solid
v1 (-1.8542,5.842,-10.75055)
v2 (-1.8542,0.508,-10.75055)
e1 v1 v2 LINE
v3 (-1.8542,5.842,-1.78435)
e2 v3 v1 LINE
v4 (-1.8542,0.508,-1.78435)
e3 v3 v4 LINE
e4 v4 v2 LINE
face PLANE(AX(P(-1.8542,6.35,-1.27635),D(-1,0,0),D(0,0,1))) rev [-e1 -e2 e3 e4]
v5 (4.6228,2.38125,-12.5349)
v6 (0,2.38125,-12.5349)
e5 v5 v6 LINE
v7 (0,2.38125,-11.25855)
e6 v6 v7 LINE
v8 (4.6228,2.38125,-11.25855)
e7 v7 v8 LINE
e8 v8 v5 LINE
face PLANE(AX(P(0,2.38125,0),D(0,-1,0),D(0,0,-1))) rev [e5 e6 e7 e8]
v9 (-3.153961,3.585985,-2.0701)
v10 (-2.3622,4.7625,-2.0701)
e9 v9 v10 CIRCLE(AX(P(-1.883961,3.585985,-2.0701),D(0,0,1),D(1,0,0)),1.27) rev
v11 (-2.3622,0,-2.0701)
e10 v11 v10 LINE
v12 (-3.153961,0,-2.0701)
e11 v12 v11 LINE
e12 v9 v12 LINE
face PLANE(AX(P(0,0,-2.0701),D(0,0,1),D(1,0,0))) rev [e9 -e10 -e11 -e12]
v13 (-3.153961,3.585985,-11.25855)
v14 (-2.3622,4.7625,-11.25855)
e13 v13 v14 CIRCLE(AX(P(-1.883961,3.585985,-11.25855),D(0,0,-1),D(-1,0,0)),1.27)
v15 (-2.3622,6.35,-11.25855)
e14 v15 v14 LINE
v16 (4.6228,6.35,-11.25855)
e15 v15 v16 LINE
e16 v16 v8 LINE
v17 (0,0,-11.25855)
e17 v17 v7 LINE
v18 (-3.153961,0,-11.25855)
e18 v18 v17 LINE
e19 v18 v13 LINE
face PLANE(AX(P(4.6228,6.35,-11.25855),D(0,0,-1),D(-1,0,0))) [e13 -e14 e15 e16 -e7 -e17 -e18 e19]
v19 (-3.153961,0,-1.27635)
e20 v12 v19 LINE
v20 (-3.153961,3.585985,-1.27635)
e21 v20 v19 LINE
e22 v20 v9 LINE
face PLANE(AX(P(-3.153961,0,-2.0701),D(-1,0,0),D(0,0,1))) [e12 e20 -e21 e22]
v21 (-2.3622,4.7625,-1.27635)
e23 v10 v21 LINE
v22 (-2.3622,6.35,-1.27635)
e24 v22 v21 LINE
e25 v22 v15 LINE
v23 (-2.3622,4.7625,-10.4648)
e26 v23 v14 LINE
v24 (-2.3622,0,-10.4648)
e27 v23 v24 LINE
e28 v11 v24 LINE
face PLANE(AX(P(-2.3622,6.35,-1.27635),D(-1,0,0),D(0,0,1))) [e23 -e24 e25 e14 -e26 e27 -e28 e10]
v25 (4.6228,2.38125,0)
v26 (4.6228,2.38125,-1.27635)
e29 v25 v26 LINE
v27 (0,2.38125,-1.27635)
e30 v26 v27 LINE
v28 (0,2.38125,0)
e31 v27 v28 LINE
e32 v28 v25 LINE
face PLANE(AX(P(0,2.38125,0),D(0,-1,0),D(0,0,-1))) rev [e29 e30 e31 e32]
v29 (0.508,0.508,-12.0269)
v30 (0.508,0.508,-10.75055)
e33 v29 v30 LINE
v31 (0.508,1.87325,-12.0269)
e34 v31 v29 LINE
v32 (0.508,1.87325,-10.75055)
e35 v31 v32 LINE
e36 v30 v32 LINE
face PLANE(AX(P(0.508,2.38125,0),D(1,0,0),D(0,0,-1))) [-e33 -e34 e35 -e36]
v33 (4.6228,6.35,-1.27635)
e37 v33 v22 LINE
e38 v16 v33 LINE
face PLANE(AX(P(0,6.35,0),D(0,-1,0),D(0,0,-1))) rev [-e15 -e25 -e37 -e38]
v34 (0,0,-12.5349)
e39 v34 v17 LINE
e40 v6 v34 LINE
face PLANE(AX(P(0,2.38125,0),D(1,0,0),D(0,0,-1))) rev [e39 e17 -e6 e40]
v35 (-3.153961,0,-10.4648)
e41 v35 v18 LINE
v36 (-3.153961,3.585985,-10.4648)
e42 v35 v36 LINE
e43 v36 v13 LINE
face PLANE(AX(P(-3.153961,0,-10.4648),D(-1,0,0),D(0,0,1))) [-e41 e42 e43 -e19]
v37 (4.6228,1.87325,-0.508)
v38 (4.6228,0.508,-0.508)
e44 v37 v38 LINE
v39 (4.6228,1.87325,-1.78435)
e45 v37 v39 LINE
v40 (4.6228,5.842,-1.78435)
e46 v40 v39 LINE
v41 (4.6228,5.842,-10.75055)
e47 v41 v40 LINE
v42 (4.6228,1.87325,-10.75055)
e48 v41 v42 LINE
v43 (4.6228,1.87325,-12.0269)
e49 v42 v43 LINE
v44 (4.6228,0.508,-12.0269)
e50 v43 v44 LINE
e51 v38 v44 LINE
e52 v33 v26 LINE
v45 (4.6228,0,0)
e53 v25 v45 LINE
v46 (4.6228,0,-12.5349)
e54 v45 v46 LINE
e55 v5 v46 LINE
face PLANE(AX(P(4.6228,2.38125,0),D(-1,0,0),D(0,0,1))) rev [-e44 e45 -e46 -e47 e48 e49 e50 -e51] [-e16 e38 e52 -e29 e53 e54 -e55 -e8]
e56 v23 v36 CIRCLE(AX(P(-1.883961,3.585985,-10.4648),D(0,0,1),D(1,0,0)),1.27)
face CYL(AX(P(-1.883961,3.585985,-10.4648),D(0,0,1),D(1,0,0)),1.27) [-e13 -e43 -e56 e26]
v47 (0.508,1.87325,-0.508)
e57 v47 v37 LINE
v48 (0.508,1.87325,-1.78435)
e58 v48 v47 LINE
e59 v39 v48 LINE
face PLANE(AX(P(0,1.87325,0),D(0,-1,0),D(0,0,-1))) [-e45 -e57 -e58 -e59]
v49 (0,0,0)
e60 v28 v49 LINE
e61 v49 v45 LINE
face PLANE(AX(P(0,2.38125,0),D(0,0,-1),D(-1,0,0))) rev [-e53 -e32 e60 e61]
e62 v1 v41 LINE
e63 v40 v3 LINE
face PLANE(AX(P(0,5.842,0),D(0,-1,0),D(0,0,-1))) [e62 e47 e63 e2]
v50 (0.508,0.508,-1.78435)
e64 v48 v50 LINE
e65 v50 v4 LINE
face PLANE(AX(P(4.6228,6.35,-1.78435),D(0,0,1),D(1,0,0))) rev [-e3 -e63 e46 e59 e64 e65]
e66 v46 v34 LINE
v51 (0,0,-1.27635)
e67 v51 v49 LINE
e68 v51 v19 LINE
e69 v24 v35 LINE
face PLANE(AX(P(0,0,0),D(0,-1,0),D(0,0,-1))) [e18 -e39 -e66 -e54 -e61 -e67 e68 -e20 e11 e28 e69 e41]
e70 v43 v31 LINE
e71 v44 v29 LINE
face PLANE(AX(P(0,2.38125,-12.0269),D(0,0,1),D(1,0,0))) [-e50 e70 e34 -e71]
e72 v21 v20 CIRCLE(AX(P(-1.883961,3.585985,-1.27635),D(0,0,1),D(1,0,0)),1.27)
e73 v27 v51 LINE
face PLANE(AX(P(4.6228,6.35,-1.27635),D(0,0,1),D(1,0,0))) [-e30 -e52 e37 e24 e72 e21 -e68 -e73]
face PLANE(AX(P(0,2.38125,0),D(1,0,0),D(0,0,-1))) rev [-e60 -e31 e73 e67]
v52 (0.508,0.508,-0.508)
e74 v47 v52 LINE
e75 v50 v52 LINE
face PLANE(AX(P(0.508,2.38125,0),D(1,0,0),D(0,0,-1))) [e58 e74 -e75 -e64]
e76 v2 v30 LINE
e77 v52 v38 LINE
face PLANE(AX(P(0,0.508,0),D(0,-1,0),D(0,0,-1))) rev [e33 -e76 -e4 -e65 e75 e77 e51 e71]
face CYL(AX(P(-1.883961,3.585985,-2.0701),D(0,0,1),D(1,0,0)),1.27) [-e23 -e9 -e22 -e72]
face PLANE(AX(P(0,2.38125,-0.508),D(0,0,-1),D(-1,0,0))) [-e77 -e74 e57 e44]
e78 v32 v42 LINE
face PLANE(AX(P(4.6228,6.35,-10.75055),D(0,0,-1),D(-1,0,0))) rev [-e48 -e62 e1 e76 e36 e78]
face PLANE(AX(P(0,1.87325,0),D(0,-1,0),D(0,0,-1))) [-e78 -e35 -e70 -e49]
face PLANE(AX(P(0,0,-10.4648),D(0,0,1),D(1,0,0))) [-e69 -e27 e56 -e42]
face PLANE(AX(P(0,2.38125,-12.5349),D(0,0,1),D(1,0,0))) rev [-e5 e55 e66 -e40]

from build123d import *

# Parameters (mm, degrees)
SKETCH1_W           = 4.6228
SKETCH1_H           = 12.5349
BOSS_EXTRUDE1_DEPTH = 2.38125
BOSS_EXTRUDE2_DEPTH = 6.35
SKETCH3_W           = 0.791761441
SKETCH3_H           = 4.7625
BOSS_EXTRUDE3_DEPTH = 0.79375
SKETCH4_W           = 0.791761441
SKETCH4_H           = 4.7625
BOSS_EXTRUDE4_DEPTH = 0.79375
FILLET1_R           = 1.27
SHELL1_START        = -1.8542
SHELL1_OUTLINE_W    = 5.334
SHELL1_OUTLINE_H    = 8.9662
SHELL1_DEPTH        = 6.477
SHELL1_START_2      = 0.508
SHELL1_2_OUTLINE_W  = 1.36525
SHELL1_2_OUTLINE_H  = 1.27635
SHELL1_2_DEPTH      = 4.1148


# Read off the part's stored shape, not the designer's step: Shell1
with BuildPart() as part:
    # Sketch1 → Boss-Extrude1 (new body)
    with BuildSketch(Plane(origin=(0, 0, 0), x_dir=(1, 0, 0), z_dir=(0, 1, 0))):
        with Locations((2.3114, 6.26745)):
            Rectangle(SKETCH1_W, SKETCH1_H)
    extrude(amount=BOSS_EXTRUDE1_DEPTH)

    # Sketch2 → Boss-Extrude2 (add)
    with BuildSketch(Plane(origin=(0, 0, 0), x_dir=(-1, 0, 0), z_dir=(0, -1, 0))):
        Polygon((-4.6228, 6.26745), (-4.6228, 11.25855), (2.3622, 11.25855), (2.3622, 1.27635), (-4.6228, 1.27635), align=None)
    extrude(amount=-BOSS_EXTRUDE2_DEPTH)

    # Sketch3 → Boss-Extrude3 (add)
    with BuildSketch(Plane.XY.offset(-1.27635)):
        with Locations((-2.758080721, 2.38125)):
            Rectangle(SKETCH3_W, SKETCH3_H)
    extrude(amount=-BOSS_EXTRUDE3_DEPTH)

    # Sketch4 → Boss-Extrude4 (add)
    with BuildSketch(Plane(origin=(0, 0, -11.25855), x_dir=(-1, 0, 0), z_dir=(0, 0, -1))):
        with Locations((2.758080721, 2.38125)):
            Rectangle(SKETCH4_W, SKETCH4_H)
    extrude(amount=-BOSS_EXTRUDE4_DEPTH)

    # Fillet1
    # the kernel refuses this fillet: 1.27 mm, written as the material it takes off along each edge
    with BuildSketch(Plane(origin=(-3.153961441, 4.7625, 1.664937857), x_dir=(1, 0, 0), z_dir=(0, 0, -1))) as fillet1_piece_1:
        with BuildLine():
            CenterArc((1.27, 1.176515143), FILLET1_R, 180, 67.878878404)
            Line((0, 1.176515143), (-0.0254, 1.176515143))
            Line((-0.0254, 1.176515143), (-0.0254, 0))
            Line((-0.0254, 0), (0, -0.0254))
            ThreePointArc((0, -0.0254), (0.395880721, -0.0254), (0.78219667, -0.023530303))
            Line((0.78219667, -0.023530303), (0.791761441, 0))
        make_face()
    extrude(amount=6.676325713, mode=Mode.SUBTRACT)
    with BuildSketch(Plane(origin=(-3.153961441, 4.7625, -14.199837857), x_dir=(0, -1, 0), z_dir=(0, 0, 1))) as fillet1_piece_2:
        with BuildLine():
            CenterArc((1.176515143, 1.27), FILLET1_R, 202.121121596, 67.878878404)
            Line((0, 0.791761441), (-0.023530303, 0.78219667))
            ThreePointArc((-0.023530303, 0.78219667), (-0.0254, 0.395880721), (-0.0254, 0))
            Line((-0.0254, 0), (0, -0.0254))
            Line((0, -0.0254), (1.176515143, -0.0254))
            Line((1.176515143, -0.0254), (1.176515143, 0))
        make_face()
    extrude(amount=6.676325713, mode=Mode.SUBTRACT)

    # Shell1 outline → Shell1 (cut)
    with BuildSketch(Plane.YZ.offset(SHELL1_START)):
        with Locations((3.175, -6.26745)):
            Rectangle(SHELL1_OUTLINE_W, SHELL1_OUTLINE_H)
    extrude(amount=SHELL1_DEPTH, mode=Mode.SUBTRACT)

    # Shell1 2 outline → Shell1 2 (cut)
    with BuildSketch(Plane.YZ.offset(SHELL1_START_2)):
        with Locations((1.190625, -11.388725)):
            Rectangle(SHELL1_2_OUTLINE_W, SHELL1_2_OUTLINE_H)
        with Locations((1.190625, -1.146175)):
            Rectangle(SHELL1_2_OUTLINE_W, SHELL1_2_OUTLINE_H)
    extrude(amount=SHELL1_2_DEPTH, mode=Mode.SUBTRACT)


solid = part.part
